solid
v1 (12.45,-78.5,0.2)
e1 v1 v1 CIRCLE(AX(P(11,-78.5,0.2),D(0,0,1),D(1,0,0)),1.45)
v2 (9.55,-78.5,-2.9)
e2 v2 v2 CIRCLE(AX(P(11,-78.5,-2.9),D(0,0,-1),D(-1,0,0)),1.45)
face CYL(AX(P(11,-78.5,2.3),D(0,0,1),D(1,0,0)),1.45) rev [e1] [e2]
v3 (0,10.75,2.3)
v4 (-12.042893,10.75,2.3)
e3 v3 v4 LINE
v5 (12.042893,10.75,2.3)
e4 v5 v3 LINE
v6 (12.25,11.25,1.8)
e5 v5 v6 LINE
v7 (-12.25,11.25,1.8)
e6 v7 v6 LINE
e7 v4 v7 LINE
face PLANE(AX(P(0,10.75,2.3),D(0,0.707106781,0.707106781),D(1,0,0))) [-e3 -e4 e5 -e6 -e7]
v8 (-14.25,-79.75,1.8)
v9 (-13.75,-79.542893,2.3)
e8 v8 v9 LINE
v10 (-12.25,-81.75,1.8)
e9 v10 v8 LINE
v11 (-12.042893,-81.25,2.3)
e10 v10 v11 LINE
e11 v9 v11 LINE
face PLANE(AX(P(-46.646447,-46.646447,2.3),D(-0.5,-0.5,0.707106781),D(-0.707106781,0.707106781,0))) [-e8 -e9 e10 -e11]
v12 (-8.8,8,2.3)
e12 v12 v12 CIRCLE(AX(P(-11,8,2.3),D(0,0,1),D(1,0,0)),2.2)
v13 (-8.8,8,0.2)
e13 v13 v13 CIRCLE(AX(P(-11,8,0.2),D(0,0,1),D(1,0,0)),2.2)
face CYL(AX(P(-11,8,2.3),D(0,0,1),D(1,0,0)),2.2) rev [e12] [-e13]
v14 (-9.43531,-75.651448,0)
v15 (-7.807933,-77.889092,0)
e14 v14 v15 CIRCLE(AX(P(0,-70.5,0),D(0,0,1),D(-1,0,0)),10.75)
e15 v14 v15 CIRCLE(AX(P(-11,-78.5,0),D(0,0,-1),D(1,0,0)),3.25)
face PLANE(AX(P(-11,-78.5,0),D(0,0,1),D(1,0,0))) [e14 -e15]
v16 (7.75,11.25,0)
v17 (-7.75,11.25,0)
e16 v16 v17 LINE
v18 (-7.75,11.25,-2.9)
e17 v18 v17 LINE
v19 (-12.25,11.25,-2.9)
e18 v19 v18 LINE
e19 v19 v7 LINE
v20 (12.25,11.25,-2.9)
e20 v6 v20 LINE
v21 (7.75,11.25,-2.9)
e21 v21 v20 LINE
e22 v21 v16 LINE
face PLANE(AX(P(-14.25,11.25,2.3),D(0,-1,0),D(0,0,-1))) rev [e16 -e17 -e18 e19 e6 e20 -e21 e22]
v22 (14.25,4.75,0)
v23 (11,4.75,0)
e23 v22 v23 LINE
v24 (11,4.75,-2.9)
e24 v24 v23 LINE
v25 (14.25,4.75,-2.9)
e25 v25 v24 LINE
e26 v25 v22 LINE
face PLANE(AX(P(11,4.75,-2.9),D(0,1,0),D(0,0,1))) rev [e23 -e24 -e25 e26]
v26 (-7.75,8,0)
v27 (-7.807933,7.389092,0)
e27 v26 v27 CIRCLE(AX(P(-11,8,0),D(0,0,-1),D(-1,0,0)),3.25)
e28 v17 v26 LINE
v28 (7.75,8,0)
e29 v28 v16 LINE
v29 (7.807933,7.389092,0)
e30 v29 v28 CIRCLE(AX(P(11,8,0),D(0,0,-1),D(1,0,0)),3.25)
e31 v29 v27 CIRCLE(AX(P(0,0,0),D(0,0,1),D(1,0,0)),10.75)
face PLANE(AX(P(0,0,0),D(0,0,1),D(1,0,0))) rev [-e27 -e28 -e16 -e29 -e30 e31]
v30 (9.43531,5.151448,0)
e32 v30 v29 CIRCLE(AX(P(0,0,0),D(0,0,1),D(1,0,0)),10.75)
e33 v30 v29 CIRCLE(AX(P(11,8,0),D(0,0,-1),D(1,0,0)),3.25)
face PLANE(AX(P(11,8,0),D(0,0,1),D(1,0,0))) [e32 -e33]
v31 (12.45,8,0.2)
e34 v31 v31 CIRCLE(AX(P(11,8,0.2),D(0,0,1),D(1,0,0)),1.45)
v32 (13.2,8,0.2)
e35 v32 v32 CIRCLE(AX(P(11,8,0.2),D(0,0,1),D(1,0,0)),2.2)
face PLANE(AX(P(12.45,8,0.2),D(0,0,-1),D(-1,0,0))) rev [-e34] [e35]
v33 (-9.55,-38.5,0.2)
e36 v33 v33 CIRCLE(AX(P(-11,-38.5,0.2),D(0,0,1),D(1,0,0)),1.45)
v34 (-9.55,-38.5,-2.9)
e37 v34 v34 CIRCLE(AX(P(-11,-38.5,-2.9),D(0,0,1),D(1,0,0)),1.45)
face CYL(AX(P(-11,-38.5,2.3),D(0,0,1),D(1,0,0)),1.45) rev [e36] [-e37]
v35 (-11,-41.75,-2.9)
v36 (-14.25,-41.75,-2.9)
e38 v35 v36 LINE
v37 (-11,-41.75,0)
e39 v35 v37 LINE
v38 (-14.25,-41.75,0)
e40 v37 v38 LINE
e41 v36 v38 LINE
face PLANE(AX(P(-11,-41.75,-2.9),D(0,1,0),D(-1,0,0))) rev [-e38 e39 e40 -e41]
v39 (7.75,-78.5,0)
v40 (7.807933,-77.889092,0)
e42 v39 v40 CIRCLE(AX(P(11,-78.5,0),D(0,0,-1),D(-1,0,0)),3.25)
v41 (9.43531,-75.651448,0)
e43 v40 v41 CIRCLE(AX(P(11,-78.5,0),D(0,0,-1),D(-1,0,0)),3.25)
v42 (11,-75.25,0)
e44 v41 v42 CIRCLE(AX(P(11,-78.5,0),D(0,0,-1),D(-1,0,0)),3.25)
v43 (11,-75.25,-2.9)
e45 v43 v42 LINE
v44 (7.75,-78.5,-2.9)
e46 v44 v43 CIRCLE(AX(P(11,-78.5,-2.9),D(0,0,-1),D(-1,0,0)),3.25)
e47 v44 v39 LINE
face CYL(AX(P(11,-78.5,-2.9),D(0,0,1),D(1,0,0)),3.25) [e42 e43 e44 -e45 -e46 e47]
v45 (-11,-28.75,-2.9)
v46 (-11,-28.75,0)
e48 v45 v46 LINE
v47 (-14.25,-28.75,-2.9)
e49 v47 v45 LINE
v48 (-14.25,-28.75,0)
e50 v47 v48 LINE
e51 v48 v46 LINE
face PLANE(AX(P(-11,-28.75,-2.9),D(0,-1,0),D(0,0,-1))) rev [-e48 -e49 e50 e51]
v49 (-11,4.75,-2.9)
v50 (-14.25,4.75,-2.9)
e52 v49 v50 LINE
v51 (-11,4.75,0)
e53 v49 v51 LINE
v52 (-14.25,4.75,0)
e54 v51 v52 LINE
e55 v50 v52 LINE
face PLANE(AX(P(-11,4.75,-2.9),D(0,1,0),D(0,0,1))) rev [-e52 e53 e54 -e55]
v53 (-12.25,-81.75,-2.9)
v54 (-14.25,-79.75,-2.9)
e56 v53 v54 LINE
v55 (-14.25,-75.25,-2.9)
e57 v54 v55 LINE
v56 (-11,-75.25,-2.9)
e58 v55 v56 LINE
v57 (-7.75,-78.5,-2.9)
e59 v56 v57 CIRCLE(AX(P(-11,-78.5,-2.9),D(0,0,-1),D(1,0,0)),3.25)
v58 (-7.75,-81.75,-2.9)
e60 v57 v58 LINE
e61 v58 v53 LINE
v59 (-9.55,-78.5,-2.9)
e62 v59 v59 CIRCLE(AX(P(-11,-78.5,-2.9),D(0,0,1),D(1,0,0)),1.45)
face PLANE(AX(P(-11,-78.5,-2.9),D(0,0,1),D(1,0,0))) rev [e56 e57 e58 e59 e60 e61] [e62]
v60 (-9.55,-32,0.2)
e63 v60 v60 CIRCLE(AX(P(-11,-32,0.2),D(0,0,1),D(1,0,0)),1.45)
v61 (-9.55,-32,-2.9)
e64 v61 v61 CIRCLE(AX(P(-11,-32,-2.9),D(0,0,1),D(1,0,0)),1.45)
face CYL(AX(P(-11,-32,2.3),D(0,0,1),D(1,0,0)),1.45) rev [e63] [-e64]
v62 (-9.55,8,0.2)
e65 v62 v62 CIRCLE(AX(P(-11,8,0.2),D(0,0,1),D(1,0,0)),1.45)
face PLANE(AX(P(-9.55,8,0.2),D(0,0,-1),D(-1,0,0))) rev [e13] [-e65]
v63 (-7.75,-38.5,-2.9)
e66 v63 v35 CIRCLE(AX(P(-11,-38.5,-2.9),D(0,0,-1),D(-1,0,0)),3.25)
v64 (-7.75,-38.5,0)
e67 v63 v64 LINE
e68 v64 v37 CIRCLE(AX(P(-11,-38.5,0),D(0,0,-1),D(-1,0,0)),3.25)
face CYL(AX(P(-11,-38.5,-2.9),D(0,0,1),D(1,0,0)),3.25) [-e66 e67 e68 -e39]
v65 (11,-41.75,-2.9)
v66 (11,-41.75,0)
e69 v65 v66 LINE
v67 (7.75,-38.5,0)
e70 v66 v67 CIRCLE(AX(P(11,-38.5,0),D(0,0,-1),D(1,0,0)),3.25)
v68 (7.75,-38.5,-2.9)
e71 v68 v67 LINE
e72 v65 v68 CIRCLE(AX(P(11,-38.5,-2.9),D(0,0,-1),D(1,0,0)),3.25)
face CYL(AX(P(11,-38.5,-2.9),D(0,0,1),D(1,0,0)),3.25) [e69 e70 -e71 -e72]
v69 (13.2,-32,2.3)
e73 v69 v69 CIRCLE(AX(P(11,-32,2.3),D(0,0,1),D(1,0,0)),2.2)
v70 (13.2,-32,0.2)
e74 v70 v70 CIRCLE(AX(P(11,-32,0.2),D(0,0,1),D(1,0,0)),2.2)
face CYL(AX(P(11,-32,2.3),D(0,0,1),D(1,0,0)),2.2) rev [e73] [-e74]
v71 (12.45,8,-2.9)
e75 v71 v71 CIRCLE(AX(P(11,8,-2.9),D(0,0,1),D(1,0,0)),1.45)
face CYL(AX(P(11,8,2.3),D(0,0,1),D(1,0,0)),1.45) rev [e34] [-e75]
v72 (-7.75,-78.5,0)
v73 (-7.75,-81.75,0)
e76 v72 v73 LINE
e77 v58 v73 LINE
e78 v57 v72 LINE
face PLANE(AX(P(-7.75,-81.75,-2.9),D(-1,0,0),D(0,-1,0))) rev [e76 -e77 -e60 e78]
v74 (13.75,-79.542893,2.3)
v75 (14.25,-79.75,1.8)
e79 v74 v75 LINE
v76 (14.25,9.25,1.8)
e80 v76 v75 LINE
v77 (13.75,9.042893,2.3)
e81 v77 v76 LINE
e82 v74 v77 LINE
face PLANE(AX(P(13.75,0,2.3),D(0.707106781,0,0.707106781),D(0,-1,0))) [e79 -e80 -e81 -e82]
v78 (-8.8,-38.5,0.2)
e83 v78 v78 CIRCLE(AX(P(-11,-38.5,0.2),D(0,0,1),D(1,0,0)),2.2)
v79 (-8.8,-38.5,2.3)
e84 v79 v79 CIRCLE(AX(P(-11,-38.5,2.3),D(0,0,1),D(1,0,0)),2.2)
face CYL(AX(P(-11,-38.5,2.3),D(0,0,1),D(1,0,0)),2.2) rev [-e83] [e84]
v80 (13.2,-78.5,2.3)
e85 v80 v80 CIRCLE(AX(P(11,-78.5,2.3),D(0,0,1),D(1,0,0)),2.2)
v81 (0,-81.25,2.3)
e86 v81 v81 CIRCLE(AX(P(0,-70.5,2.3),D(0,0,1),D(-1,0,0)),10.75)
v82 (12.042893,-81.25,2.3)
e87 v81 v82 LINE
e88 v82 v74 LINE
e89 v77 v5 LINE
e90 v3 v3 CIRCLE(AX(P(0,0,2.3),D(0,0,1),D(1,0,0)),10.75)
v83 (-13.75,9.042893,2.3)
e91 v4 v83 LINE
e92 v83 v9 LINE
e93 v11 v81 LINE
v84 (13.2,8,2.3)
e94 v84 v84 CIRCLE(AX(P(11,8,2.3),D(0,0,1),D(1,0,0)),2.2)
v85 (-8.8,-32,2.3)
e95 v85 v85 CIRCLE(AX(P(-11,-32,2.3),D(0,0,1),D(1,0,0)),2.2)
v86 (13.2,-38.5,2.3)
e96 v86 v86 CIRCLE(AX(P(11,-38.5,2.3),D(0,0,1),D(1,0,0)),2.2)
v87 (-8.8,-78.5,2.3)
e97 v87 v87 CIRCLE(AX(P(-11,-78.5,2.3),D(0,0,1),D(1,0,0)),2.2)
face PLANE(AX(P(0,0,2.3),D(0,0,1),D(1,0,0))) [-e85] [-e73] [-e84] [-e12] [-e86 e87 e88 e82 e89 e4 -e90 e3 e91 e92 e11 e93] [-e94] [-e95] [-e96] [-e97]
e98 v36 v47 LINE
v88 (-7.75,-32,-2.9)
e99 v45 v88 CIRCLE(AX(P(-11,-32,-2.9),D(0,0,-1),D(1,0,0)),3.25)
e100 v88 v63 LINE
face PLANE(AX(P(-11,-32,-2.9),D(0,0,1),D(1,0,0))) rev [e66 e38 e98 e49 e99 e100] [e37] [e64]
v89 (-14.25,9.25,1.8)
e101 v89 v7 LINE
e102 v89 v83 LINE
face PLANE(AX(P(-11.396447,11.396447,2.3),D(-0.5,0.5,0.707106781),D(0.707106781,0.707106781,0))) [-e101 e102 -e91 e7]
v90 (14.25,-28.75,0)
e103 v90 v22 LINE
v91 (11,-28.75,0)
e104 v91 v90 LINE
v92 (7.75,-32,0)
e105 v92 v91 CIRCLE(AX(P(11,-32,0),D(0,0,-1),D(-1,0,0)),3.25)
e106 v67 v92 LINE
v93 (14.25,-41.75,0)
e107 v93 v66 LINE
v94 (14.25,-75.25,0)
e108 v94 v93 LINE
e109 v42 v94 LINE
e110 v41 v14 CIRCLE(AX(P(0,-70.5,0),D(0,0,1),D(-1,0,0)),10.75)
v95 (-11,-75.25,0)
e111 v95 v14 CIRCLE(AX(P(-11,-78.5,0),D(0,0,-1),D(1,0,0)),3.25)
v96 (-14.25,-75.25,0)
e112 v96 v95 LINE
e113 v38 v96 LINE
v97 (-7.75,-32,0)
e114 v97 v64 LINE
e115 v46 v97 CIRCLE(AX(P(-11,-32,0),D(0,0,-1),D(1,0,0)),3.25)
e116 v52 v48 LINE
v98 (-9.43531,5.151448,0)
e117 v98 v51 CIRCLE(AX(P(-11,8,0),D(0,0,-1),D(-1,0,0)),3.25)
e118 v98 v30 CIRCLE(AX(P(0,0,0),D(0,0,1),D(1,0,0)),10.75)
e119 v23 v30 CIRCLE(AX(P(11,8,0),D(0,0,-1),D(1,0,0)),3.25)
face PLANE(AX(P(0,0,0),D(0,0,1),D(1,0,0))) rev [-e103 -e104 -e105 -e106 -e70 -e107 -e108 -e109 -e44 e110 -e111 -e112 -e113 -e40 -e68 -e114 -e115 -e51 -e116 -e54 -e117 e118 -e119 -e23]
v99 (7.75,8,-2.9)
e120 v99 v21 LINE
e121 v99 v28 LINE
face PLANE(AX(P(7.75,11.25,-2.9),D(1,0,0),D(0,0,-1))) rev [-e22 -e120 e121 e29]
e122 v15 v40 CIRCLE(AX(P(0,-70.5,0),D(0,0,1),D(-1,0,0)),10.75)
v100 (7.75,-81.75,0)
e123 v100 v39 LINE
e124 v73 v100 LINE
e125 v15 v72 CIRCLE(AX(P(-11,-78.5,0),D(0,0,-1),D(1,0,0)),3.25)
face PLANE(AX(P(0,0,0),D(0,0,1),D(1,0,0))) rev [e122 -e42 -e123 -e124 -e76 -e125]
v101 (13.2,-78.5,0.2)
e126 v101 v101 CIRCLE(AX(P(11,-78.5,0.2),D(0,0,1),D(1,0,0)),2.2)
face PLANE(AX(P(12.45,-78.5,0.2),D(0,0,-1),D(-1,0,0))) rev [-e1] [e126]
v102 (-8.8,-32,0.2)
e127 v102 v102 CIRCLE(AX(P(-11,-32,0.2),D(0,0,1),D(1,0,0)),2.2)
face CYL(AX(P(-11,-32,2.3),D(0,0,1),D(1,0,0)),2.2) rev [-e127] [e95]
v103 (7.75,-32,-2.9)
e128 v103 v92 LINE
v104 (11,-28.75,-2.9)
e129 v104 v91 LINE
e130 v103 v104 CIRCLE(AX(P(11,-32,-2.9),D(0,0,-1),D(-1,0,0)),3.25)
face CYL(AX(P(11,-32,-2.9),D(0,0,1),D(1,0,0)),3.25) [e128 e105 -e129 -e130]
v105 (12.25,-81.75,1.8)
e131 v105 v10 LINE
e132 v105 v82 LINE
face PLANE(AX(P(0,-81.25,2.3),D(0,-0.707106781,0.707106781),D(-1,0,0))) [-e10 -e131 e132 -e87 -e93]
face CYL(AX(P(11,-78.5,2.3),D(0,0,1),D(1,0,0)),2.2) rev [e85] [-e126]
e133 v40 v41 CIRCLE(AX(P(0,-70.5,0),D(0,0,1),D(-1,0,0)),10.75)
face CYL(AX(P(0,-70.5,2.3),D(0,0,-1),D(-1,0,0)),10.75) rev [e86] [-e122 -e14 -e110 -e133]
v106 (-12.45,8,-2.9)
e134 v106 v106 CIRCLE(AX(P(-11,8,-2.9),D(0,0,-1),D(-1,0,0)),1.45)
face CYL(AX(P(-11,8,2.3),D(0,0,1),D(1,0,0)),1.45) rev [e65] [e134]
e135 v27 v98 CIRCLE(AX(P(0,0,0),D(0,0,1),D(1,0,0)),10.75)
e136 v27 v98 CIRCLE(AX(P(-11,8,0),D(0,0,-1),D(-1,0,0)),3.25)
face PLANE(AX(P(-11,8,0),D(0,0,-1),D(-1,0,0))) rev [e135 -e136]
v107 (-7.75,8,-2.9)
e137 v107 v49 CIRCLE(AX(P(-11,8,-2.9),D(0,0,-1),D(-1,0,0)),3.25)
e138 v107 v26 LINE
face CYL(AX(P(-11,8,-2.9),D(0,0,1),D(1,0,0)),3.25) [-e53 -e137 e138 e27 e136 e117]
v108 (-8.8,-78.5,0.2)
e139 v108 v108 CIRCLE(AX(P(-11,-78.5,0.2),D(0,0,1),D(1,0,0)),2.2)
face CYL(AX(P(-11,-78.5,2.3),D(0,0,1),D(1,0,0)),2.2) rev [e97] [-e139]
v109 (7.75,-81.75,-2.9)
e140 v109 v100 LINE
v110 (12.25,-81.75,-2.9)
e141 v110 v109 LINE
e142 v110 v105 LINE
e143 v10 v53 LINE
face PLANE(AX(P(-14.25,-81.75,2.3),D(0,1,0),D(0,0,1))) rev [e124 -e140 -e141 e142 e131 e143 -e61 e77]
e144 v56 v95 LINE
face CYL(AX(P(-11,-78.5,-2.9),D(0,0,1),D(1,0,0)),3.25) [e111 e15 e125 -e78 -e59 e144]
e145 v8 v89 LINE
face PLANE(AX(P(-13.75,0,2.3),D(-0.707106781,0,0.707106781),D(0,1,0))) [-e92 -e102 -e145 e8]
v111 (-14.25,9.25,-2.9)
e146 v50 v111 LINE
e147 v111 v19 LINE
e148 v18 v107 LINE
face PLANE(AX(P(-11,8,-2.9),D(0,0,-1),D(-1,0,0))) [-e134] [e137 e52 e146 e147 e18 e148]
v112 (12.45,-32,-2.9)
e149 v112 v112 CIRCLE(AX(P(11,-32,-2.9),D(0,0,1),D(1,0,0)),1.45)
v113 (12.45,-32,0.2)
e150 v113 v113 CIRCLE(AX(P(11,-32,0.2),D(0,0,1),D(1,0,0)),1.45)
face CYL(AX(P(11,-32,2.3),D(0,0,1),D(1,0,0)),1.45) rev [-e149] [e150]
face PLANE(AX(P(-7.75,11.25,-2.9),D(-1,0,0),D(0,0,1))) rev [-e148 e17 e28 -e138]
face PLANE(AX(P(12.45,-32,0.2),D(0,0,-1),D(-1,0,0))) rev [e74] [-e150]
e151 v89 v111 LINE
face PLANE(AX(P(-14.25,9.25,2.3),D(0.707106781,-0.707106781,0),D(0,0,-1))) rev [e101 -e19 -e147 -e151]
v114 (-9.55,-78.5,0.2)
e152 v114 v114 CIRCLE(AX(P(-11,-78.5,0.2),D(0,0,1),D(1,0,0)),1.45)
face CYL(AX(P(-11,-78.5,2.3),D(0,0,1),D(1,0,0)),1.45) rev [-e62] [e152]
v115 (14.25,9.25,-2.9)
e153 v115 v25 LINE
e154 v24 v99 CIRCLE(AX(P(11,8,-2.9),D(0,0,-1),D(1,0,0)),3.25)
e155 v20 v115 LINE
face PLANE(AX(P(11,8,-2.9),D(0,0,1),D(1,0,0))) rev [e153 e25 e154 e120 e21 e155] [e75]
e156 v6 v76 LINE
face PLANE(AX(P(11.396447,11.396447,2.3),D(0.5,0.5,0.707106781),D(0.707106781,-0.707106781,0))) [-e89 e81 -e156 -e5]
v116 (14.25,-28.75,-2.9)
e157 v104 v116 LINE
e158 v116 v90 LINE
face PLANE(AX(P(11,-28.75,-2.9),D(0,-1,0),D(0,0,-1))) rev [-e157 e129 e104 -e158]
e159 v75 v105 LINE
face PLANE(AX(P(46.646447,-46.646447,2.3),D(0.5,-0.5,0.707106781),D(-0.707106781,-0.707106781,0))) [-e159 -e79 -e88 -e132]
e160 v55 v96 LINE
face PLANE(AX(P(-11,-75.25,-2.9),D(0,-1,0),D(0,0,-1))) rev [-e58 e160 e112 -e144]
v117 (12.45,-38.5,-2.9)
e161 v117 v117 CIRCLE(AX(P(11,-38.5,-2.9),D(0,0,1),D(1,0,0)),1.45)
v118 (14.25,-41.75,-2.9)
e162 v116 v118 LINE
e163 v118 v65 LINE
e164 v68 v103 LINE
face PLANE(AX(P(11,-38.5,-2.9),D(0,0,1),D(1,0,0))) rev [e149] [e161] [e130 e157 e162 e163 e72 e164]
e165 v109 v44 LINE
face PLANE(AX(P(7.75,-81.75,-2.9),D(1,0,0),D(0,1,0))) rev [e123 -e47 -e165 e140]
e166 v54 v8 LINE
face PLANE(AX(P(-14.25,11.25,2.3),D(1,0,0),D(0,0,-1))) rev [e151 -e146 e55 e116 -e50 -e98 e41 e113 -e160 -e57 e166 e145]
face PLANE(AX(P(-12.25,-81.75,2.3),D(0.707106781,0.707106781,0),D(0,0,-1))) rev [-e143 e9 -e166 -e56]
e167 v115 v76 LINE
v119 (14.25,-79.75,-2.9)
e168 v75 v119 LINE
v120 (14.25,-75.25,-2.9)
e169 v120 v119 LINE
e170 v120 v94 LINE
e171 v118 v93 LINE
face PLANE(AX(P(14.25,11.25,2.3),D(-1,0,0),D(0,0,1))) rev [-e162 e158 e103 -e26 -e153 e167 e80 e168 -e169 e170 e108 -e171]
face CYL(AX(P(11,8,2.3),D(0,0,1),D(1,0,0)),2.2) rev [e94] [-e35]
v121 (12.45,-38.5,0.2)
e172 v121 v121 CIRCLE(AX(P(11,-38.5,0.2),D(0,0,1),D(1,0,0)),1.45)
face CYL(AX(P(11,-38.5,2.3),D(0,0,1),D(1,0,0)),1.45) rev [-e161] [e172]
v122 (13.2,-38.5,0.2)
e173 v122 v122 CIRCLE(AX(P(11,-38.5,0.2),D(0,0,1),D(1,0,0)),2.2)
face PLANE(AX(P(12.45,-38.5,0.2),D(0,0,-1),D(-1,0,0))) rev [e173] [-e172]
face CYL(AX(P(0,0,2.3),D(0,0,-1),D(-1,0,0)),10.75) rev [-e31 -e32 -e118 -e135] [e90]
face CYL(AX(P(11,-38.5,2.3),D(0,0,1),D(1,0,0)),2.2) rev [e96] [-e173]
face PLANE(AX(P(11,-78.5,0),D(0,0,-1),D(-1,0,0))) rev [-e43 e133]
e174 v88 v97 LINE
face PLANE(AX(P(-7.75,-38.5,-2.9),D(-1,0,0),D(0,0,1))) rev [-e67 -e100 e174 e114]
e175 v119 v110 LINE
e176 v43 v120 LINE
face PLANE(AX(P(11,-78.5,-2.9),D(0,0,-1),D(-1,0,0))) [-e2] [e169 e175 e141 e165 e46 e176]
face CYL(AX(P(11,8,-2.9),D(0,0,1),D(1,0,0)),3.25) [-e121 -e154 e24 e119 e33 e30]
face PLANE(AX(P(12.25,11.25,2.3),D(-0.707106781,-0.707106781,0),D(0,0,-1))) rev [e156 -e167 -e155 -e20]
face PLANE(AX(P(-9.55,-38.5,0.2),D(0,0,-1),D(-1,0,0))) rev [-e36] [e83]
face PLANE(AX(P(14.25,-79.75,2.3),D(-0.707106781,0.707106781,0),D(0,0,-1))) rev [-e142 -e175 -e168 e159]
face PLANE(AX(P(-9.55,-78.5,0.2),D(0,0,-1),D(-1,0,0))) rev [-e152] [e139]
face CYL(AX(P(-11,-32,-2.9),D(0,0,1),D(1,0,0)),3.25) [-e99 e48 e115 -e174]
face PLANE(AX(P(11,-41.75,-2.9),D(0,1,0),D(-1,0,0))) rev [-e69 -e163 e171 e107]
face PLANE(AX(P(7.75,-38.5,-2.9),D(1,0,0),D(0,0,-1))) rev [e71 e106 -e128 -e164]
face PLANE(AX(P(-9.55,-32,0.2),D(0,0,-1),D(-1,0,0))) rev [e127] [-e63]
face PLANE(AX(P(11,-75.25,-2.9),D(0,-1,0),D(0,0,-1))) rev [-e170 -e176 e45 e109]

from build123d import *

# Parameters (mm, degrees)
SKETCH2_W                                  = 28.5
SKETCH2_H                                  = 93
SKETCH2_R                                  = 10.75
BOSS_EXTRUDE1_DEPTH                        = 2.3
BOSS_EXTRUDE2_DEPTH                        = 2.9
CBORE_FOR_M2_5_PAN_HEAD_SCREW1_D           = 2.9
CBORE_FOR_M2_5_PAN_HEAD_SCREW1_DEPTH       = 8
CBORE_FOR_M2_5_PAN_HEAD_SCREW1_CBORE_D     = 4.4
CBORE_FOR_M2_5_PAN_HEAD_SCREW1_CBORE_DEPTH = 2.1
CBORE_FOR_M2_5_PAN_HEAD_SCREW1_TIP         = 0.871247898
CHAMFER1_SIZE                              = 2
CHAMFER2_SIZE                              = 0.5


with BuildPart() as part:
    # Sketch2 → Boss-Extrude1 (new body)
    with BuildSketch(Plane.XY):
        with Locations((0, -35.25)):
            Rectangle(SKETCH2_W, SKETCH2_H)
        Circle(SKETCH2_R, mode=Mode.SUBTRACT)
        with Locations(Location((0, -70.5, 0), (0, 0, 180))):
            Circle(SKETCH2_R, mode=Mode.SUBTRACT)
    extrude(amount=BOSS_EXTRUDE1_DEPTH)

    # Sketch3 → Boss-Extrude2 (add)
    with BuildSketch(Plane(origin=(0, 0, 0), x_dir=(-1, 0, 0), z_dir=(0, 0, -1))):
        with BuildLine():
            Line((7.75, 11.25), (7.75, 8))
            ThreePointArc((7.75, 8), (8.701902961, 5.701902961), (11, 4.75))
            Line((11, 4.75), (14.25, 4.75))
            Line((14.25, 4.75), (14.25, 11.25))
            Line((14.25, 11.25), (7.75, 11.25))
        make_face()
        with BuildLine():
            Line((11, -41.75), (14.25, -41.75))
            Line((14.25, -41.75), (14.25, -28.75))
            Line((14.25, -28.75), (11, -28.75))
            ThreePointArc((11, -28.75), (8.701902961, -29.701902961), (7.75, -32))
            Line((7.75, -32), (7.75, -38.5))
            ThreePointArc((7.75, -38.5), (8.701902961, -40.798097039), (11, -41.75))
        make_face()
        with BuildLine():
            Line((14.25, -81.75), (7.75, -81.75))
            Line((7.75, -81.75), (7.75, -78.5))
            ThreePointArc((7.75, -78.5), (8.701902961, -76.201902961), (11, -75.25))
            Line((11, -75.25), (14.25, -75.25))
            Line((14.25, -75.25), (14.25, -81.75))
        make_face()
        with BuildLine():
            Line((-14.25, 11.25), (-7.75, 11.25))
            Line((-7.75, 11.25), (-7.75, 8))
            ThreePointArc((-7.75, 8), (-8.701902961, 5.701902961), (-11, 4.75))
            Line((-11, 4.75), (-14.25, 4.75))
            Line((-14.25, 4.75), (-14.25, 11.25))
        make_face()
        with BuildLine():
            Line((-7.75, -38.5), (-7.75, -32))
            ThreePointArc((-7.75, -32), (-8.701902961, -29.701902961), (-11, -28.75))
            Line((-11, -28.75), (-14.25, -28.75))
            Line((-14.25, -28.75), (-14.25, -41.75))
            Line((-14.25, -41.75), (-11, -41.75))
            ThreePointArc((-11, -41.75), (-8.701902961, -40.798097039), (-7.75, -38.5))
        make_face()
        with BuildLine():
            Line((-7.75, -81.75), (-7.75, -78.5))
            ThreePointArc((-7.75, -78.5), (-8.701902961, -76.201902961), (-11, -75.25))
            Line((-11, -75.25), (-14.25, -75.25))
            Line((-14.25, -75.25), (-14.25, -81.75))
            Line((-14.25, -81.75), (-7.75, -81.75))
        make_face()
    extrude(amount=BOSS_EXTRUDE2_DEPTH)

    # CBORE for M2.5 Pan Head Screw1
    with Locations(Plane.XY.offset(2.3)):
        with Locations((-11, 8), (11, 8), (11, -32), (-11, -32), (-11, -38.5), (11, -38.5), (11, -78.5), (-11, -78.5)):
            CounterBoreHole(CBORE_FOR_M2_5_PAN_HEAD_SCREW1_D / 2, CBORE_FOR_M2_5_PAN_HEAD_SCREW1_CBORE_D / 2, CBORE_FOR_M2_5_PAN_HEAD_SCREW1_CBORE_DEPTH, depth=CBORE_FOR_M2_5_PAN_HEAD_SCREW1_DEPTH)
            with Locations((0, 0, -(CBORE_FOR_M2_5_PAN_HEAD_SCREW1_DEPTH + CBORE_FOR_M2_5_PAN_HEAD_SCREW1_TIP / 2))):  # 118° drill point
                Cone(0, CBORE_FOR_M2_5_PAN_HEAD_SCREW1_D / 2, CBORE_FOR_M2_5_PAN_HEAD_SCREW1_TIP, mode=Mode.SUBTRACT)

    # Chamfer1
    chamfer1_edges = [part.edges().sort_by_distance(p)[0] for p in [
        (-14.25, 11.25, -0.3),
        (14.25, 11.25, -0.3),
        (14.25, -81.75, -0.3),
        (-14.25, -81.75, -0.3),
    ]]
    chamfer(chamfer1_edges, length=CHAMFER1_SIZE)

    # Chamfer2
    chamfer2_edges = [part.edges().sort_by_distance(p)[0] for p in [
        (0, -81.75, 2.3),
        (-14.25, -35.25, 2.3),
        (14.25, -35.25, 2.3),
        (0, 11.25, 2.3),
        (-13.25, 10.25, 2.3),
        (13.25, 10.25, 2.3),
        (13.25, -80.75, 2.3),
        (-13.25, -80.75, 2.3),
    ]]
    chamfer(chamfer2_edges, length=CHAMFER2_SIZE - 0.0001)  # a hair under: the kernel refuses the full size


solid = part.part
